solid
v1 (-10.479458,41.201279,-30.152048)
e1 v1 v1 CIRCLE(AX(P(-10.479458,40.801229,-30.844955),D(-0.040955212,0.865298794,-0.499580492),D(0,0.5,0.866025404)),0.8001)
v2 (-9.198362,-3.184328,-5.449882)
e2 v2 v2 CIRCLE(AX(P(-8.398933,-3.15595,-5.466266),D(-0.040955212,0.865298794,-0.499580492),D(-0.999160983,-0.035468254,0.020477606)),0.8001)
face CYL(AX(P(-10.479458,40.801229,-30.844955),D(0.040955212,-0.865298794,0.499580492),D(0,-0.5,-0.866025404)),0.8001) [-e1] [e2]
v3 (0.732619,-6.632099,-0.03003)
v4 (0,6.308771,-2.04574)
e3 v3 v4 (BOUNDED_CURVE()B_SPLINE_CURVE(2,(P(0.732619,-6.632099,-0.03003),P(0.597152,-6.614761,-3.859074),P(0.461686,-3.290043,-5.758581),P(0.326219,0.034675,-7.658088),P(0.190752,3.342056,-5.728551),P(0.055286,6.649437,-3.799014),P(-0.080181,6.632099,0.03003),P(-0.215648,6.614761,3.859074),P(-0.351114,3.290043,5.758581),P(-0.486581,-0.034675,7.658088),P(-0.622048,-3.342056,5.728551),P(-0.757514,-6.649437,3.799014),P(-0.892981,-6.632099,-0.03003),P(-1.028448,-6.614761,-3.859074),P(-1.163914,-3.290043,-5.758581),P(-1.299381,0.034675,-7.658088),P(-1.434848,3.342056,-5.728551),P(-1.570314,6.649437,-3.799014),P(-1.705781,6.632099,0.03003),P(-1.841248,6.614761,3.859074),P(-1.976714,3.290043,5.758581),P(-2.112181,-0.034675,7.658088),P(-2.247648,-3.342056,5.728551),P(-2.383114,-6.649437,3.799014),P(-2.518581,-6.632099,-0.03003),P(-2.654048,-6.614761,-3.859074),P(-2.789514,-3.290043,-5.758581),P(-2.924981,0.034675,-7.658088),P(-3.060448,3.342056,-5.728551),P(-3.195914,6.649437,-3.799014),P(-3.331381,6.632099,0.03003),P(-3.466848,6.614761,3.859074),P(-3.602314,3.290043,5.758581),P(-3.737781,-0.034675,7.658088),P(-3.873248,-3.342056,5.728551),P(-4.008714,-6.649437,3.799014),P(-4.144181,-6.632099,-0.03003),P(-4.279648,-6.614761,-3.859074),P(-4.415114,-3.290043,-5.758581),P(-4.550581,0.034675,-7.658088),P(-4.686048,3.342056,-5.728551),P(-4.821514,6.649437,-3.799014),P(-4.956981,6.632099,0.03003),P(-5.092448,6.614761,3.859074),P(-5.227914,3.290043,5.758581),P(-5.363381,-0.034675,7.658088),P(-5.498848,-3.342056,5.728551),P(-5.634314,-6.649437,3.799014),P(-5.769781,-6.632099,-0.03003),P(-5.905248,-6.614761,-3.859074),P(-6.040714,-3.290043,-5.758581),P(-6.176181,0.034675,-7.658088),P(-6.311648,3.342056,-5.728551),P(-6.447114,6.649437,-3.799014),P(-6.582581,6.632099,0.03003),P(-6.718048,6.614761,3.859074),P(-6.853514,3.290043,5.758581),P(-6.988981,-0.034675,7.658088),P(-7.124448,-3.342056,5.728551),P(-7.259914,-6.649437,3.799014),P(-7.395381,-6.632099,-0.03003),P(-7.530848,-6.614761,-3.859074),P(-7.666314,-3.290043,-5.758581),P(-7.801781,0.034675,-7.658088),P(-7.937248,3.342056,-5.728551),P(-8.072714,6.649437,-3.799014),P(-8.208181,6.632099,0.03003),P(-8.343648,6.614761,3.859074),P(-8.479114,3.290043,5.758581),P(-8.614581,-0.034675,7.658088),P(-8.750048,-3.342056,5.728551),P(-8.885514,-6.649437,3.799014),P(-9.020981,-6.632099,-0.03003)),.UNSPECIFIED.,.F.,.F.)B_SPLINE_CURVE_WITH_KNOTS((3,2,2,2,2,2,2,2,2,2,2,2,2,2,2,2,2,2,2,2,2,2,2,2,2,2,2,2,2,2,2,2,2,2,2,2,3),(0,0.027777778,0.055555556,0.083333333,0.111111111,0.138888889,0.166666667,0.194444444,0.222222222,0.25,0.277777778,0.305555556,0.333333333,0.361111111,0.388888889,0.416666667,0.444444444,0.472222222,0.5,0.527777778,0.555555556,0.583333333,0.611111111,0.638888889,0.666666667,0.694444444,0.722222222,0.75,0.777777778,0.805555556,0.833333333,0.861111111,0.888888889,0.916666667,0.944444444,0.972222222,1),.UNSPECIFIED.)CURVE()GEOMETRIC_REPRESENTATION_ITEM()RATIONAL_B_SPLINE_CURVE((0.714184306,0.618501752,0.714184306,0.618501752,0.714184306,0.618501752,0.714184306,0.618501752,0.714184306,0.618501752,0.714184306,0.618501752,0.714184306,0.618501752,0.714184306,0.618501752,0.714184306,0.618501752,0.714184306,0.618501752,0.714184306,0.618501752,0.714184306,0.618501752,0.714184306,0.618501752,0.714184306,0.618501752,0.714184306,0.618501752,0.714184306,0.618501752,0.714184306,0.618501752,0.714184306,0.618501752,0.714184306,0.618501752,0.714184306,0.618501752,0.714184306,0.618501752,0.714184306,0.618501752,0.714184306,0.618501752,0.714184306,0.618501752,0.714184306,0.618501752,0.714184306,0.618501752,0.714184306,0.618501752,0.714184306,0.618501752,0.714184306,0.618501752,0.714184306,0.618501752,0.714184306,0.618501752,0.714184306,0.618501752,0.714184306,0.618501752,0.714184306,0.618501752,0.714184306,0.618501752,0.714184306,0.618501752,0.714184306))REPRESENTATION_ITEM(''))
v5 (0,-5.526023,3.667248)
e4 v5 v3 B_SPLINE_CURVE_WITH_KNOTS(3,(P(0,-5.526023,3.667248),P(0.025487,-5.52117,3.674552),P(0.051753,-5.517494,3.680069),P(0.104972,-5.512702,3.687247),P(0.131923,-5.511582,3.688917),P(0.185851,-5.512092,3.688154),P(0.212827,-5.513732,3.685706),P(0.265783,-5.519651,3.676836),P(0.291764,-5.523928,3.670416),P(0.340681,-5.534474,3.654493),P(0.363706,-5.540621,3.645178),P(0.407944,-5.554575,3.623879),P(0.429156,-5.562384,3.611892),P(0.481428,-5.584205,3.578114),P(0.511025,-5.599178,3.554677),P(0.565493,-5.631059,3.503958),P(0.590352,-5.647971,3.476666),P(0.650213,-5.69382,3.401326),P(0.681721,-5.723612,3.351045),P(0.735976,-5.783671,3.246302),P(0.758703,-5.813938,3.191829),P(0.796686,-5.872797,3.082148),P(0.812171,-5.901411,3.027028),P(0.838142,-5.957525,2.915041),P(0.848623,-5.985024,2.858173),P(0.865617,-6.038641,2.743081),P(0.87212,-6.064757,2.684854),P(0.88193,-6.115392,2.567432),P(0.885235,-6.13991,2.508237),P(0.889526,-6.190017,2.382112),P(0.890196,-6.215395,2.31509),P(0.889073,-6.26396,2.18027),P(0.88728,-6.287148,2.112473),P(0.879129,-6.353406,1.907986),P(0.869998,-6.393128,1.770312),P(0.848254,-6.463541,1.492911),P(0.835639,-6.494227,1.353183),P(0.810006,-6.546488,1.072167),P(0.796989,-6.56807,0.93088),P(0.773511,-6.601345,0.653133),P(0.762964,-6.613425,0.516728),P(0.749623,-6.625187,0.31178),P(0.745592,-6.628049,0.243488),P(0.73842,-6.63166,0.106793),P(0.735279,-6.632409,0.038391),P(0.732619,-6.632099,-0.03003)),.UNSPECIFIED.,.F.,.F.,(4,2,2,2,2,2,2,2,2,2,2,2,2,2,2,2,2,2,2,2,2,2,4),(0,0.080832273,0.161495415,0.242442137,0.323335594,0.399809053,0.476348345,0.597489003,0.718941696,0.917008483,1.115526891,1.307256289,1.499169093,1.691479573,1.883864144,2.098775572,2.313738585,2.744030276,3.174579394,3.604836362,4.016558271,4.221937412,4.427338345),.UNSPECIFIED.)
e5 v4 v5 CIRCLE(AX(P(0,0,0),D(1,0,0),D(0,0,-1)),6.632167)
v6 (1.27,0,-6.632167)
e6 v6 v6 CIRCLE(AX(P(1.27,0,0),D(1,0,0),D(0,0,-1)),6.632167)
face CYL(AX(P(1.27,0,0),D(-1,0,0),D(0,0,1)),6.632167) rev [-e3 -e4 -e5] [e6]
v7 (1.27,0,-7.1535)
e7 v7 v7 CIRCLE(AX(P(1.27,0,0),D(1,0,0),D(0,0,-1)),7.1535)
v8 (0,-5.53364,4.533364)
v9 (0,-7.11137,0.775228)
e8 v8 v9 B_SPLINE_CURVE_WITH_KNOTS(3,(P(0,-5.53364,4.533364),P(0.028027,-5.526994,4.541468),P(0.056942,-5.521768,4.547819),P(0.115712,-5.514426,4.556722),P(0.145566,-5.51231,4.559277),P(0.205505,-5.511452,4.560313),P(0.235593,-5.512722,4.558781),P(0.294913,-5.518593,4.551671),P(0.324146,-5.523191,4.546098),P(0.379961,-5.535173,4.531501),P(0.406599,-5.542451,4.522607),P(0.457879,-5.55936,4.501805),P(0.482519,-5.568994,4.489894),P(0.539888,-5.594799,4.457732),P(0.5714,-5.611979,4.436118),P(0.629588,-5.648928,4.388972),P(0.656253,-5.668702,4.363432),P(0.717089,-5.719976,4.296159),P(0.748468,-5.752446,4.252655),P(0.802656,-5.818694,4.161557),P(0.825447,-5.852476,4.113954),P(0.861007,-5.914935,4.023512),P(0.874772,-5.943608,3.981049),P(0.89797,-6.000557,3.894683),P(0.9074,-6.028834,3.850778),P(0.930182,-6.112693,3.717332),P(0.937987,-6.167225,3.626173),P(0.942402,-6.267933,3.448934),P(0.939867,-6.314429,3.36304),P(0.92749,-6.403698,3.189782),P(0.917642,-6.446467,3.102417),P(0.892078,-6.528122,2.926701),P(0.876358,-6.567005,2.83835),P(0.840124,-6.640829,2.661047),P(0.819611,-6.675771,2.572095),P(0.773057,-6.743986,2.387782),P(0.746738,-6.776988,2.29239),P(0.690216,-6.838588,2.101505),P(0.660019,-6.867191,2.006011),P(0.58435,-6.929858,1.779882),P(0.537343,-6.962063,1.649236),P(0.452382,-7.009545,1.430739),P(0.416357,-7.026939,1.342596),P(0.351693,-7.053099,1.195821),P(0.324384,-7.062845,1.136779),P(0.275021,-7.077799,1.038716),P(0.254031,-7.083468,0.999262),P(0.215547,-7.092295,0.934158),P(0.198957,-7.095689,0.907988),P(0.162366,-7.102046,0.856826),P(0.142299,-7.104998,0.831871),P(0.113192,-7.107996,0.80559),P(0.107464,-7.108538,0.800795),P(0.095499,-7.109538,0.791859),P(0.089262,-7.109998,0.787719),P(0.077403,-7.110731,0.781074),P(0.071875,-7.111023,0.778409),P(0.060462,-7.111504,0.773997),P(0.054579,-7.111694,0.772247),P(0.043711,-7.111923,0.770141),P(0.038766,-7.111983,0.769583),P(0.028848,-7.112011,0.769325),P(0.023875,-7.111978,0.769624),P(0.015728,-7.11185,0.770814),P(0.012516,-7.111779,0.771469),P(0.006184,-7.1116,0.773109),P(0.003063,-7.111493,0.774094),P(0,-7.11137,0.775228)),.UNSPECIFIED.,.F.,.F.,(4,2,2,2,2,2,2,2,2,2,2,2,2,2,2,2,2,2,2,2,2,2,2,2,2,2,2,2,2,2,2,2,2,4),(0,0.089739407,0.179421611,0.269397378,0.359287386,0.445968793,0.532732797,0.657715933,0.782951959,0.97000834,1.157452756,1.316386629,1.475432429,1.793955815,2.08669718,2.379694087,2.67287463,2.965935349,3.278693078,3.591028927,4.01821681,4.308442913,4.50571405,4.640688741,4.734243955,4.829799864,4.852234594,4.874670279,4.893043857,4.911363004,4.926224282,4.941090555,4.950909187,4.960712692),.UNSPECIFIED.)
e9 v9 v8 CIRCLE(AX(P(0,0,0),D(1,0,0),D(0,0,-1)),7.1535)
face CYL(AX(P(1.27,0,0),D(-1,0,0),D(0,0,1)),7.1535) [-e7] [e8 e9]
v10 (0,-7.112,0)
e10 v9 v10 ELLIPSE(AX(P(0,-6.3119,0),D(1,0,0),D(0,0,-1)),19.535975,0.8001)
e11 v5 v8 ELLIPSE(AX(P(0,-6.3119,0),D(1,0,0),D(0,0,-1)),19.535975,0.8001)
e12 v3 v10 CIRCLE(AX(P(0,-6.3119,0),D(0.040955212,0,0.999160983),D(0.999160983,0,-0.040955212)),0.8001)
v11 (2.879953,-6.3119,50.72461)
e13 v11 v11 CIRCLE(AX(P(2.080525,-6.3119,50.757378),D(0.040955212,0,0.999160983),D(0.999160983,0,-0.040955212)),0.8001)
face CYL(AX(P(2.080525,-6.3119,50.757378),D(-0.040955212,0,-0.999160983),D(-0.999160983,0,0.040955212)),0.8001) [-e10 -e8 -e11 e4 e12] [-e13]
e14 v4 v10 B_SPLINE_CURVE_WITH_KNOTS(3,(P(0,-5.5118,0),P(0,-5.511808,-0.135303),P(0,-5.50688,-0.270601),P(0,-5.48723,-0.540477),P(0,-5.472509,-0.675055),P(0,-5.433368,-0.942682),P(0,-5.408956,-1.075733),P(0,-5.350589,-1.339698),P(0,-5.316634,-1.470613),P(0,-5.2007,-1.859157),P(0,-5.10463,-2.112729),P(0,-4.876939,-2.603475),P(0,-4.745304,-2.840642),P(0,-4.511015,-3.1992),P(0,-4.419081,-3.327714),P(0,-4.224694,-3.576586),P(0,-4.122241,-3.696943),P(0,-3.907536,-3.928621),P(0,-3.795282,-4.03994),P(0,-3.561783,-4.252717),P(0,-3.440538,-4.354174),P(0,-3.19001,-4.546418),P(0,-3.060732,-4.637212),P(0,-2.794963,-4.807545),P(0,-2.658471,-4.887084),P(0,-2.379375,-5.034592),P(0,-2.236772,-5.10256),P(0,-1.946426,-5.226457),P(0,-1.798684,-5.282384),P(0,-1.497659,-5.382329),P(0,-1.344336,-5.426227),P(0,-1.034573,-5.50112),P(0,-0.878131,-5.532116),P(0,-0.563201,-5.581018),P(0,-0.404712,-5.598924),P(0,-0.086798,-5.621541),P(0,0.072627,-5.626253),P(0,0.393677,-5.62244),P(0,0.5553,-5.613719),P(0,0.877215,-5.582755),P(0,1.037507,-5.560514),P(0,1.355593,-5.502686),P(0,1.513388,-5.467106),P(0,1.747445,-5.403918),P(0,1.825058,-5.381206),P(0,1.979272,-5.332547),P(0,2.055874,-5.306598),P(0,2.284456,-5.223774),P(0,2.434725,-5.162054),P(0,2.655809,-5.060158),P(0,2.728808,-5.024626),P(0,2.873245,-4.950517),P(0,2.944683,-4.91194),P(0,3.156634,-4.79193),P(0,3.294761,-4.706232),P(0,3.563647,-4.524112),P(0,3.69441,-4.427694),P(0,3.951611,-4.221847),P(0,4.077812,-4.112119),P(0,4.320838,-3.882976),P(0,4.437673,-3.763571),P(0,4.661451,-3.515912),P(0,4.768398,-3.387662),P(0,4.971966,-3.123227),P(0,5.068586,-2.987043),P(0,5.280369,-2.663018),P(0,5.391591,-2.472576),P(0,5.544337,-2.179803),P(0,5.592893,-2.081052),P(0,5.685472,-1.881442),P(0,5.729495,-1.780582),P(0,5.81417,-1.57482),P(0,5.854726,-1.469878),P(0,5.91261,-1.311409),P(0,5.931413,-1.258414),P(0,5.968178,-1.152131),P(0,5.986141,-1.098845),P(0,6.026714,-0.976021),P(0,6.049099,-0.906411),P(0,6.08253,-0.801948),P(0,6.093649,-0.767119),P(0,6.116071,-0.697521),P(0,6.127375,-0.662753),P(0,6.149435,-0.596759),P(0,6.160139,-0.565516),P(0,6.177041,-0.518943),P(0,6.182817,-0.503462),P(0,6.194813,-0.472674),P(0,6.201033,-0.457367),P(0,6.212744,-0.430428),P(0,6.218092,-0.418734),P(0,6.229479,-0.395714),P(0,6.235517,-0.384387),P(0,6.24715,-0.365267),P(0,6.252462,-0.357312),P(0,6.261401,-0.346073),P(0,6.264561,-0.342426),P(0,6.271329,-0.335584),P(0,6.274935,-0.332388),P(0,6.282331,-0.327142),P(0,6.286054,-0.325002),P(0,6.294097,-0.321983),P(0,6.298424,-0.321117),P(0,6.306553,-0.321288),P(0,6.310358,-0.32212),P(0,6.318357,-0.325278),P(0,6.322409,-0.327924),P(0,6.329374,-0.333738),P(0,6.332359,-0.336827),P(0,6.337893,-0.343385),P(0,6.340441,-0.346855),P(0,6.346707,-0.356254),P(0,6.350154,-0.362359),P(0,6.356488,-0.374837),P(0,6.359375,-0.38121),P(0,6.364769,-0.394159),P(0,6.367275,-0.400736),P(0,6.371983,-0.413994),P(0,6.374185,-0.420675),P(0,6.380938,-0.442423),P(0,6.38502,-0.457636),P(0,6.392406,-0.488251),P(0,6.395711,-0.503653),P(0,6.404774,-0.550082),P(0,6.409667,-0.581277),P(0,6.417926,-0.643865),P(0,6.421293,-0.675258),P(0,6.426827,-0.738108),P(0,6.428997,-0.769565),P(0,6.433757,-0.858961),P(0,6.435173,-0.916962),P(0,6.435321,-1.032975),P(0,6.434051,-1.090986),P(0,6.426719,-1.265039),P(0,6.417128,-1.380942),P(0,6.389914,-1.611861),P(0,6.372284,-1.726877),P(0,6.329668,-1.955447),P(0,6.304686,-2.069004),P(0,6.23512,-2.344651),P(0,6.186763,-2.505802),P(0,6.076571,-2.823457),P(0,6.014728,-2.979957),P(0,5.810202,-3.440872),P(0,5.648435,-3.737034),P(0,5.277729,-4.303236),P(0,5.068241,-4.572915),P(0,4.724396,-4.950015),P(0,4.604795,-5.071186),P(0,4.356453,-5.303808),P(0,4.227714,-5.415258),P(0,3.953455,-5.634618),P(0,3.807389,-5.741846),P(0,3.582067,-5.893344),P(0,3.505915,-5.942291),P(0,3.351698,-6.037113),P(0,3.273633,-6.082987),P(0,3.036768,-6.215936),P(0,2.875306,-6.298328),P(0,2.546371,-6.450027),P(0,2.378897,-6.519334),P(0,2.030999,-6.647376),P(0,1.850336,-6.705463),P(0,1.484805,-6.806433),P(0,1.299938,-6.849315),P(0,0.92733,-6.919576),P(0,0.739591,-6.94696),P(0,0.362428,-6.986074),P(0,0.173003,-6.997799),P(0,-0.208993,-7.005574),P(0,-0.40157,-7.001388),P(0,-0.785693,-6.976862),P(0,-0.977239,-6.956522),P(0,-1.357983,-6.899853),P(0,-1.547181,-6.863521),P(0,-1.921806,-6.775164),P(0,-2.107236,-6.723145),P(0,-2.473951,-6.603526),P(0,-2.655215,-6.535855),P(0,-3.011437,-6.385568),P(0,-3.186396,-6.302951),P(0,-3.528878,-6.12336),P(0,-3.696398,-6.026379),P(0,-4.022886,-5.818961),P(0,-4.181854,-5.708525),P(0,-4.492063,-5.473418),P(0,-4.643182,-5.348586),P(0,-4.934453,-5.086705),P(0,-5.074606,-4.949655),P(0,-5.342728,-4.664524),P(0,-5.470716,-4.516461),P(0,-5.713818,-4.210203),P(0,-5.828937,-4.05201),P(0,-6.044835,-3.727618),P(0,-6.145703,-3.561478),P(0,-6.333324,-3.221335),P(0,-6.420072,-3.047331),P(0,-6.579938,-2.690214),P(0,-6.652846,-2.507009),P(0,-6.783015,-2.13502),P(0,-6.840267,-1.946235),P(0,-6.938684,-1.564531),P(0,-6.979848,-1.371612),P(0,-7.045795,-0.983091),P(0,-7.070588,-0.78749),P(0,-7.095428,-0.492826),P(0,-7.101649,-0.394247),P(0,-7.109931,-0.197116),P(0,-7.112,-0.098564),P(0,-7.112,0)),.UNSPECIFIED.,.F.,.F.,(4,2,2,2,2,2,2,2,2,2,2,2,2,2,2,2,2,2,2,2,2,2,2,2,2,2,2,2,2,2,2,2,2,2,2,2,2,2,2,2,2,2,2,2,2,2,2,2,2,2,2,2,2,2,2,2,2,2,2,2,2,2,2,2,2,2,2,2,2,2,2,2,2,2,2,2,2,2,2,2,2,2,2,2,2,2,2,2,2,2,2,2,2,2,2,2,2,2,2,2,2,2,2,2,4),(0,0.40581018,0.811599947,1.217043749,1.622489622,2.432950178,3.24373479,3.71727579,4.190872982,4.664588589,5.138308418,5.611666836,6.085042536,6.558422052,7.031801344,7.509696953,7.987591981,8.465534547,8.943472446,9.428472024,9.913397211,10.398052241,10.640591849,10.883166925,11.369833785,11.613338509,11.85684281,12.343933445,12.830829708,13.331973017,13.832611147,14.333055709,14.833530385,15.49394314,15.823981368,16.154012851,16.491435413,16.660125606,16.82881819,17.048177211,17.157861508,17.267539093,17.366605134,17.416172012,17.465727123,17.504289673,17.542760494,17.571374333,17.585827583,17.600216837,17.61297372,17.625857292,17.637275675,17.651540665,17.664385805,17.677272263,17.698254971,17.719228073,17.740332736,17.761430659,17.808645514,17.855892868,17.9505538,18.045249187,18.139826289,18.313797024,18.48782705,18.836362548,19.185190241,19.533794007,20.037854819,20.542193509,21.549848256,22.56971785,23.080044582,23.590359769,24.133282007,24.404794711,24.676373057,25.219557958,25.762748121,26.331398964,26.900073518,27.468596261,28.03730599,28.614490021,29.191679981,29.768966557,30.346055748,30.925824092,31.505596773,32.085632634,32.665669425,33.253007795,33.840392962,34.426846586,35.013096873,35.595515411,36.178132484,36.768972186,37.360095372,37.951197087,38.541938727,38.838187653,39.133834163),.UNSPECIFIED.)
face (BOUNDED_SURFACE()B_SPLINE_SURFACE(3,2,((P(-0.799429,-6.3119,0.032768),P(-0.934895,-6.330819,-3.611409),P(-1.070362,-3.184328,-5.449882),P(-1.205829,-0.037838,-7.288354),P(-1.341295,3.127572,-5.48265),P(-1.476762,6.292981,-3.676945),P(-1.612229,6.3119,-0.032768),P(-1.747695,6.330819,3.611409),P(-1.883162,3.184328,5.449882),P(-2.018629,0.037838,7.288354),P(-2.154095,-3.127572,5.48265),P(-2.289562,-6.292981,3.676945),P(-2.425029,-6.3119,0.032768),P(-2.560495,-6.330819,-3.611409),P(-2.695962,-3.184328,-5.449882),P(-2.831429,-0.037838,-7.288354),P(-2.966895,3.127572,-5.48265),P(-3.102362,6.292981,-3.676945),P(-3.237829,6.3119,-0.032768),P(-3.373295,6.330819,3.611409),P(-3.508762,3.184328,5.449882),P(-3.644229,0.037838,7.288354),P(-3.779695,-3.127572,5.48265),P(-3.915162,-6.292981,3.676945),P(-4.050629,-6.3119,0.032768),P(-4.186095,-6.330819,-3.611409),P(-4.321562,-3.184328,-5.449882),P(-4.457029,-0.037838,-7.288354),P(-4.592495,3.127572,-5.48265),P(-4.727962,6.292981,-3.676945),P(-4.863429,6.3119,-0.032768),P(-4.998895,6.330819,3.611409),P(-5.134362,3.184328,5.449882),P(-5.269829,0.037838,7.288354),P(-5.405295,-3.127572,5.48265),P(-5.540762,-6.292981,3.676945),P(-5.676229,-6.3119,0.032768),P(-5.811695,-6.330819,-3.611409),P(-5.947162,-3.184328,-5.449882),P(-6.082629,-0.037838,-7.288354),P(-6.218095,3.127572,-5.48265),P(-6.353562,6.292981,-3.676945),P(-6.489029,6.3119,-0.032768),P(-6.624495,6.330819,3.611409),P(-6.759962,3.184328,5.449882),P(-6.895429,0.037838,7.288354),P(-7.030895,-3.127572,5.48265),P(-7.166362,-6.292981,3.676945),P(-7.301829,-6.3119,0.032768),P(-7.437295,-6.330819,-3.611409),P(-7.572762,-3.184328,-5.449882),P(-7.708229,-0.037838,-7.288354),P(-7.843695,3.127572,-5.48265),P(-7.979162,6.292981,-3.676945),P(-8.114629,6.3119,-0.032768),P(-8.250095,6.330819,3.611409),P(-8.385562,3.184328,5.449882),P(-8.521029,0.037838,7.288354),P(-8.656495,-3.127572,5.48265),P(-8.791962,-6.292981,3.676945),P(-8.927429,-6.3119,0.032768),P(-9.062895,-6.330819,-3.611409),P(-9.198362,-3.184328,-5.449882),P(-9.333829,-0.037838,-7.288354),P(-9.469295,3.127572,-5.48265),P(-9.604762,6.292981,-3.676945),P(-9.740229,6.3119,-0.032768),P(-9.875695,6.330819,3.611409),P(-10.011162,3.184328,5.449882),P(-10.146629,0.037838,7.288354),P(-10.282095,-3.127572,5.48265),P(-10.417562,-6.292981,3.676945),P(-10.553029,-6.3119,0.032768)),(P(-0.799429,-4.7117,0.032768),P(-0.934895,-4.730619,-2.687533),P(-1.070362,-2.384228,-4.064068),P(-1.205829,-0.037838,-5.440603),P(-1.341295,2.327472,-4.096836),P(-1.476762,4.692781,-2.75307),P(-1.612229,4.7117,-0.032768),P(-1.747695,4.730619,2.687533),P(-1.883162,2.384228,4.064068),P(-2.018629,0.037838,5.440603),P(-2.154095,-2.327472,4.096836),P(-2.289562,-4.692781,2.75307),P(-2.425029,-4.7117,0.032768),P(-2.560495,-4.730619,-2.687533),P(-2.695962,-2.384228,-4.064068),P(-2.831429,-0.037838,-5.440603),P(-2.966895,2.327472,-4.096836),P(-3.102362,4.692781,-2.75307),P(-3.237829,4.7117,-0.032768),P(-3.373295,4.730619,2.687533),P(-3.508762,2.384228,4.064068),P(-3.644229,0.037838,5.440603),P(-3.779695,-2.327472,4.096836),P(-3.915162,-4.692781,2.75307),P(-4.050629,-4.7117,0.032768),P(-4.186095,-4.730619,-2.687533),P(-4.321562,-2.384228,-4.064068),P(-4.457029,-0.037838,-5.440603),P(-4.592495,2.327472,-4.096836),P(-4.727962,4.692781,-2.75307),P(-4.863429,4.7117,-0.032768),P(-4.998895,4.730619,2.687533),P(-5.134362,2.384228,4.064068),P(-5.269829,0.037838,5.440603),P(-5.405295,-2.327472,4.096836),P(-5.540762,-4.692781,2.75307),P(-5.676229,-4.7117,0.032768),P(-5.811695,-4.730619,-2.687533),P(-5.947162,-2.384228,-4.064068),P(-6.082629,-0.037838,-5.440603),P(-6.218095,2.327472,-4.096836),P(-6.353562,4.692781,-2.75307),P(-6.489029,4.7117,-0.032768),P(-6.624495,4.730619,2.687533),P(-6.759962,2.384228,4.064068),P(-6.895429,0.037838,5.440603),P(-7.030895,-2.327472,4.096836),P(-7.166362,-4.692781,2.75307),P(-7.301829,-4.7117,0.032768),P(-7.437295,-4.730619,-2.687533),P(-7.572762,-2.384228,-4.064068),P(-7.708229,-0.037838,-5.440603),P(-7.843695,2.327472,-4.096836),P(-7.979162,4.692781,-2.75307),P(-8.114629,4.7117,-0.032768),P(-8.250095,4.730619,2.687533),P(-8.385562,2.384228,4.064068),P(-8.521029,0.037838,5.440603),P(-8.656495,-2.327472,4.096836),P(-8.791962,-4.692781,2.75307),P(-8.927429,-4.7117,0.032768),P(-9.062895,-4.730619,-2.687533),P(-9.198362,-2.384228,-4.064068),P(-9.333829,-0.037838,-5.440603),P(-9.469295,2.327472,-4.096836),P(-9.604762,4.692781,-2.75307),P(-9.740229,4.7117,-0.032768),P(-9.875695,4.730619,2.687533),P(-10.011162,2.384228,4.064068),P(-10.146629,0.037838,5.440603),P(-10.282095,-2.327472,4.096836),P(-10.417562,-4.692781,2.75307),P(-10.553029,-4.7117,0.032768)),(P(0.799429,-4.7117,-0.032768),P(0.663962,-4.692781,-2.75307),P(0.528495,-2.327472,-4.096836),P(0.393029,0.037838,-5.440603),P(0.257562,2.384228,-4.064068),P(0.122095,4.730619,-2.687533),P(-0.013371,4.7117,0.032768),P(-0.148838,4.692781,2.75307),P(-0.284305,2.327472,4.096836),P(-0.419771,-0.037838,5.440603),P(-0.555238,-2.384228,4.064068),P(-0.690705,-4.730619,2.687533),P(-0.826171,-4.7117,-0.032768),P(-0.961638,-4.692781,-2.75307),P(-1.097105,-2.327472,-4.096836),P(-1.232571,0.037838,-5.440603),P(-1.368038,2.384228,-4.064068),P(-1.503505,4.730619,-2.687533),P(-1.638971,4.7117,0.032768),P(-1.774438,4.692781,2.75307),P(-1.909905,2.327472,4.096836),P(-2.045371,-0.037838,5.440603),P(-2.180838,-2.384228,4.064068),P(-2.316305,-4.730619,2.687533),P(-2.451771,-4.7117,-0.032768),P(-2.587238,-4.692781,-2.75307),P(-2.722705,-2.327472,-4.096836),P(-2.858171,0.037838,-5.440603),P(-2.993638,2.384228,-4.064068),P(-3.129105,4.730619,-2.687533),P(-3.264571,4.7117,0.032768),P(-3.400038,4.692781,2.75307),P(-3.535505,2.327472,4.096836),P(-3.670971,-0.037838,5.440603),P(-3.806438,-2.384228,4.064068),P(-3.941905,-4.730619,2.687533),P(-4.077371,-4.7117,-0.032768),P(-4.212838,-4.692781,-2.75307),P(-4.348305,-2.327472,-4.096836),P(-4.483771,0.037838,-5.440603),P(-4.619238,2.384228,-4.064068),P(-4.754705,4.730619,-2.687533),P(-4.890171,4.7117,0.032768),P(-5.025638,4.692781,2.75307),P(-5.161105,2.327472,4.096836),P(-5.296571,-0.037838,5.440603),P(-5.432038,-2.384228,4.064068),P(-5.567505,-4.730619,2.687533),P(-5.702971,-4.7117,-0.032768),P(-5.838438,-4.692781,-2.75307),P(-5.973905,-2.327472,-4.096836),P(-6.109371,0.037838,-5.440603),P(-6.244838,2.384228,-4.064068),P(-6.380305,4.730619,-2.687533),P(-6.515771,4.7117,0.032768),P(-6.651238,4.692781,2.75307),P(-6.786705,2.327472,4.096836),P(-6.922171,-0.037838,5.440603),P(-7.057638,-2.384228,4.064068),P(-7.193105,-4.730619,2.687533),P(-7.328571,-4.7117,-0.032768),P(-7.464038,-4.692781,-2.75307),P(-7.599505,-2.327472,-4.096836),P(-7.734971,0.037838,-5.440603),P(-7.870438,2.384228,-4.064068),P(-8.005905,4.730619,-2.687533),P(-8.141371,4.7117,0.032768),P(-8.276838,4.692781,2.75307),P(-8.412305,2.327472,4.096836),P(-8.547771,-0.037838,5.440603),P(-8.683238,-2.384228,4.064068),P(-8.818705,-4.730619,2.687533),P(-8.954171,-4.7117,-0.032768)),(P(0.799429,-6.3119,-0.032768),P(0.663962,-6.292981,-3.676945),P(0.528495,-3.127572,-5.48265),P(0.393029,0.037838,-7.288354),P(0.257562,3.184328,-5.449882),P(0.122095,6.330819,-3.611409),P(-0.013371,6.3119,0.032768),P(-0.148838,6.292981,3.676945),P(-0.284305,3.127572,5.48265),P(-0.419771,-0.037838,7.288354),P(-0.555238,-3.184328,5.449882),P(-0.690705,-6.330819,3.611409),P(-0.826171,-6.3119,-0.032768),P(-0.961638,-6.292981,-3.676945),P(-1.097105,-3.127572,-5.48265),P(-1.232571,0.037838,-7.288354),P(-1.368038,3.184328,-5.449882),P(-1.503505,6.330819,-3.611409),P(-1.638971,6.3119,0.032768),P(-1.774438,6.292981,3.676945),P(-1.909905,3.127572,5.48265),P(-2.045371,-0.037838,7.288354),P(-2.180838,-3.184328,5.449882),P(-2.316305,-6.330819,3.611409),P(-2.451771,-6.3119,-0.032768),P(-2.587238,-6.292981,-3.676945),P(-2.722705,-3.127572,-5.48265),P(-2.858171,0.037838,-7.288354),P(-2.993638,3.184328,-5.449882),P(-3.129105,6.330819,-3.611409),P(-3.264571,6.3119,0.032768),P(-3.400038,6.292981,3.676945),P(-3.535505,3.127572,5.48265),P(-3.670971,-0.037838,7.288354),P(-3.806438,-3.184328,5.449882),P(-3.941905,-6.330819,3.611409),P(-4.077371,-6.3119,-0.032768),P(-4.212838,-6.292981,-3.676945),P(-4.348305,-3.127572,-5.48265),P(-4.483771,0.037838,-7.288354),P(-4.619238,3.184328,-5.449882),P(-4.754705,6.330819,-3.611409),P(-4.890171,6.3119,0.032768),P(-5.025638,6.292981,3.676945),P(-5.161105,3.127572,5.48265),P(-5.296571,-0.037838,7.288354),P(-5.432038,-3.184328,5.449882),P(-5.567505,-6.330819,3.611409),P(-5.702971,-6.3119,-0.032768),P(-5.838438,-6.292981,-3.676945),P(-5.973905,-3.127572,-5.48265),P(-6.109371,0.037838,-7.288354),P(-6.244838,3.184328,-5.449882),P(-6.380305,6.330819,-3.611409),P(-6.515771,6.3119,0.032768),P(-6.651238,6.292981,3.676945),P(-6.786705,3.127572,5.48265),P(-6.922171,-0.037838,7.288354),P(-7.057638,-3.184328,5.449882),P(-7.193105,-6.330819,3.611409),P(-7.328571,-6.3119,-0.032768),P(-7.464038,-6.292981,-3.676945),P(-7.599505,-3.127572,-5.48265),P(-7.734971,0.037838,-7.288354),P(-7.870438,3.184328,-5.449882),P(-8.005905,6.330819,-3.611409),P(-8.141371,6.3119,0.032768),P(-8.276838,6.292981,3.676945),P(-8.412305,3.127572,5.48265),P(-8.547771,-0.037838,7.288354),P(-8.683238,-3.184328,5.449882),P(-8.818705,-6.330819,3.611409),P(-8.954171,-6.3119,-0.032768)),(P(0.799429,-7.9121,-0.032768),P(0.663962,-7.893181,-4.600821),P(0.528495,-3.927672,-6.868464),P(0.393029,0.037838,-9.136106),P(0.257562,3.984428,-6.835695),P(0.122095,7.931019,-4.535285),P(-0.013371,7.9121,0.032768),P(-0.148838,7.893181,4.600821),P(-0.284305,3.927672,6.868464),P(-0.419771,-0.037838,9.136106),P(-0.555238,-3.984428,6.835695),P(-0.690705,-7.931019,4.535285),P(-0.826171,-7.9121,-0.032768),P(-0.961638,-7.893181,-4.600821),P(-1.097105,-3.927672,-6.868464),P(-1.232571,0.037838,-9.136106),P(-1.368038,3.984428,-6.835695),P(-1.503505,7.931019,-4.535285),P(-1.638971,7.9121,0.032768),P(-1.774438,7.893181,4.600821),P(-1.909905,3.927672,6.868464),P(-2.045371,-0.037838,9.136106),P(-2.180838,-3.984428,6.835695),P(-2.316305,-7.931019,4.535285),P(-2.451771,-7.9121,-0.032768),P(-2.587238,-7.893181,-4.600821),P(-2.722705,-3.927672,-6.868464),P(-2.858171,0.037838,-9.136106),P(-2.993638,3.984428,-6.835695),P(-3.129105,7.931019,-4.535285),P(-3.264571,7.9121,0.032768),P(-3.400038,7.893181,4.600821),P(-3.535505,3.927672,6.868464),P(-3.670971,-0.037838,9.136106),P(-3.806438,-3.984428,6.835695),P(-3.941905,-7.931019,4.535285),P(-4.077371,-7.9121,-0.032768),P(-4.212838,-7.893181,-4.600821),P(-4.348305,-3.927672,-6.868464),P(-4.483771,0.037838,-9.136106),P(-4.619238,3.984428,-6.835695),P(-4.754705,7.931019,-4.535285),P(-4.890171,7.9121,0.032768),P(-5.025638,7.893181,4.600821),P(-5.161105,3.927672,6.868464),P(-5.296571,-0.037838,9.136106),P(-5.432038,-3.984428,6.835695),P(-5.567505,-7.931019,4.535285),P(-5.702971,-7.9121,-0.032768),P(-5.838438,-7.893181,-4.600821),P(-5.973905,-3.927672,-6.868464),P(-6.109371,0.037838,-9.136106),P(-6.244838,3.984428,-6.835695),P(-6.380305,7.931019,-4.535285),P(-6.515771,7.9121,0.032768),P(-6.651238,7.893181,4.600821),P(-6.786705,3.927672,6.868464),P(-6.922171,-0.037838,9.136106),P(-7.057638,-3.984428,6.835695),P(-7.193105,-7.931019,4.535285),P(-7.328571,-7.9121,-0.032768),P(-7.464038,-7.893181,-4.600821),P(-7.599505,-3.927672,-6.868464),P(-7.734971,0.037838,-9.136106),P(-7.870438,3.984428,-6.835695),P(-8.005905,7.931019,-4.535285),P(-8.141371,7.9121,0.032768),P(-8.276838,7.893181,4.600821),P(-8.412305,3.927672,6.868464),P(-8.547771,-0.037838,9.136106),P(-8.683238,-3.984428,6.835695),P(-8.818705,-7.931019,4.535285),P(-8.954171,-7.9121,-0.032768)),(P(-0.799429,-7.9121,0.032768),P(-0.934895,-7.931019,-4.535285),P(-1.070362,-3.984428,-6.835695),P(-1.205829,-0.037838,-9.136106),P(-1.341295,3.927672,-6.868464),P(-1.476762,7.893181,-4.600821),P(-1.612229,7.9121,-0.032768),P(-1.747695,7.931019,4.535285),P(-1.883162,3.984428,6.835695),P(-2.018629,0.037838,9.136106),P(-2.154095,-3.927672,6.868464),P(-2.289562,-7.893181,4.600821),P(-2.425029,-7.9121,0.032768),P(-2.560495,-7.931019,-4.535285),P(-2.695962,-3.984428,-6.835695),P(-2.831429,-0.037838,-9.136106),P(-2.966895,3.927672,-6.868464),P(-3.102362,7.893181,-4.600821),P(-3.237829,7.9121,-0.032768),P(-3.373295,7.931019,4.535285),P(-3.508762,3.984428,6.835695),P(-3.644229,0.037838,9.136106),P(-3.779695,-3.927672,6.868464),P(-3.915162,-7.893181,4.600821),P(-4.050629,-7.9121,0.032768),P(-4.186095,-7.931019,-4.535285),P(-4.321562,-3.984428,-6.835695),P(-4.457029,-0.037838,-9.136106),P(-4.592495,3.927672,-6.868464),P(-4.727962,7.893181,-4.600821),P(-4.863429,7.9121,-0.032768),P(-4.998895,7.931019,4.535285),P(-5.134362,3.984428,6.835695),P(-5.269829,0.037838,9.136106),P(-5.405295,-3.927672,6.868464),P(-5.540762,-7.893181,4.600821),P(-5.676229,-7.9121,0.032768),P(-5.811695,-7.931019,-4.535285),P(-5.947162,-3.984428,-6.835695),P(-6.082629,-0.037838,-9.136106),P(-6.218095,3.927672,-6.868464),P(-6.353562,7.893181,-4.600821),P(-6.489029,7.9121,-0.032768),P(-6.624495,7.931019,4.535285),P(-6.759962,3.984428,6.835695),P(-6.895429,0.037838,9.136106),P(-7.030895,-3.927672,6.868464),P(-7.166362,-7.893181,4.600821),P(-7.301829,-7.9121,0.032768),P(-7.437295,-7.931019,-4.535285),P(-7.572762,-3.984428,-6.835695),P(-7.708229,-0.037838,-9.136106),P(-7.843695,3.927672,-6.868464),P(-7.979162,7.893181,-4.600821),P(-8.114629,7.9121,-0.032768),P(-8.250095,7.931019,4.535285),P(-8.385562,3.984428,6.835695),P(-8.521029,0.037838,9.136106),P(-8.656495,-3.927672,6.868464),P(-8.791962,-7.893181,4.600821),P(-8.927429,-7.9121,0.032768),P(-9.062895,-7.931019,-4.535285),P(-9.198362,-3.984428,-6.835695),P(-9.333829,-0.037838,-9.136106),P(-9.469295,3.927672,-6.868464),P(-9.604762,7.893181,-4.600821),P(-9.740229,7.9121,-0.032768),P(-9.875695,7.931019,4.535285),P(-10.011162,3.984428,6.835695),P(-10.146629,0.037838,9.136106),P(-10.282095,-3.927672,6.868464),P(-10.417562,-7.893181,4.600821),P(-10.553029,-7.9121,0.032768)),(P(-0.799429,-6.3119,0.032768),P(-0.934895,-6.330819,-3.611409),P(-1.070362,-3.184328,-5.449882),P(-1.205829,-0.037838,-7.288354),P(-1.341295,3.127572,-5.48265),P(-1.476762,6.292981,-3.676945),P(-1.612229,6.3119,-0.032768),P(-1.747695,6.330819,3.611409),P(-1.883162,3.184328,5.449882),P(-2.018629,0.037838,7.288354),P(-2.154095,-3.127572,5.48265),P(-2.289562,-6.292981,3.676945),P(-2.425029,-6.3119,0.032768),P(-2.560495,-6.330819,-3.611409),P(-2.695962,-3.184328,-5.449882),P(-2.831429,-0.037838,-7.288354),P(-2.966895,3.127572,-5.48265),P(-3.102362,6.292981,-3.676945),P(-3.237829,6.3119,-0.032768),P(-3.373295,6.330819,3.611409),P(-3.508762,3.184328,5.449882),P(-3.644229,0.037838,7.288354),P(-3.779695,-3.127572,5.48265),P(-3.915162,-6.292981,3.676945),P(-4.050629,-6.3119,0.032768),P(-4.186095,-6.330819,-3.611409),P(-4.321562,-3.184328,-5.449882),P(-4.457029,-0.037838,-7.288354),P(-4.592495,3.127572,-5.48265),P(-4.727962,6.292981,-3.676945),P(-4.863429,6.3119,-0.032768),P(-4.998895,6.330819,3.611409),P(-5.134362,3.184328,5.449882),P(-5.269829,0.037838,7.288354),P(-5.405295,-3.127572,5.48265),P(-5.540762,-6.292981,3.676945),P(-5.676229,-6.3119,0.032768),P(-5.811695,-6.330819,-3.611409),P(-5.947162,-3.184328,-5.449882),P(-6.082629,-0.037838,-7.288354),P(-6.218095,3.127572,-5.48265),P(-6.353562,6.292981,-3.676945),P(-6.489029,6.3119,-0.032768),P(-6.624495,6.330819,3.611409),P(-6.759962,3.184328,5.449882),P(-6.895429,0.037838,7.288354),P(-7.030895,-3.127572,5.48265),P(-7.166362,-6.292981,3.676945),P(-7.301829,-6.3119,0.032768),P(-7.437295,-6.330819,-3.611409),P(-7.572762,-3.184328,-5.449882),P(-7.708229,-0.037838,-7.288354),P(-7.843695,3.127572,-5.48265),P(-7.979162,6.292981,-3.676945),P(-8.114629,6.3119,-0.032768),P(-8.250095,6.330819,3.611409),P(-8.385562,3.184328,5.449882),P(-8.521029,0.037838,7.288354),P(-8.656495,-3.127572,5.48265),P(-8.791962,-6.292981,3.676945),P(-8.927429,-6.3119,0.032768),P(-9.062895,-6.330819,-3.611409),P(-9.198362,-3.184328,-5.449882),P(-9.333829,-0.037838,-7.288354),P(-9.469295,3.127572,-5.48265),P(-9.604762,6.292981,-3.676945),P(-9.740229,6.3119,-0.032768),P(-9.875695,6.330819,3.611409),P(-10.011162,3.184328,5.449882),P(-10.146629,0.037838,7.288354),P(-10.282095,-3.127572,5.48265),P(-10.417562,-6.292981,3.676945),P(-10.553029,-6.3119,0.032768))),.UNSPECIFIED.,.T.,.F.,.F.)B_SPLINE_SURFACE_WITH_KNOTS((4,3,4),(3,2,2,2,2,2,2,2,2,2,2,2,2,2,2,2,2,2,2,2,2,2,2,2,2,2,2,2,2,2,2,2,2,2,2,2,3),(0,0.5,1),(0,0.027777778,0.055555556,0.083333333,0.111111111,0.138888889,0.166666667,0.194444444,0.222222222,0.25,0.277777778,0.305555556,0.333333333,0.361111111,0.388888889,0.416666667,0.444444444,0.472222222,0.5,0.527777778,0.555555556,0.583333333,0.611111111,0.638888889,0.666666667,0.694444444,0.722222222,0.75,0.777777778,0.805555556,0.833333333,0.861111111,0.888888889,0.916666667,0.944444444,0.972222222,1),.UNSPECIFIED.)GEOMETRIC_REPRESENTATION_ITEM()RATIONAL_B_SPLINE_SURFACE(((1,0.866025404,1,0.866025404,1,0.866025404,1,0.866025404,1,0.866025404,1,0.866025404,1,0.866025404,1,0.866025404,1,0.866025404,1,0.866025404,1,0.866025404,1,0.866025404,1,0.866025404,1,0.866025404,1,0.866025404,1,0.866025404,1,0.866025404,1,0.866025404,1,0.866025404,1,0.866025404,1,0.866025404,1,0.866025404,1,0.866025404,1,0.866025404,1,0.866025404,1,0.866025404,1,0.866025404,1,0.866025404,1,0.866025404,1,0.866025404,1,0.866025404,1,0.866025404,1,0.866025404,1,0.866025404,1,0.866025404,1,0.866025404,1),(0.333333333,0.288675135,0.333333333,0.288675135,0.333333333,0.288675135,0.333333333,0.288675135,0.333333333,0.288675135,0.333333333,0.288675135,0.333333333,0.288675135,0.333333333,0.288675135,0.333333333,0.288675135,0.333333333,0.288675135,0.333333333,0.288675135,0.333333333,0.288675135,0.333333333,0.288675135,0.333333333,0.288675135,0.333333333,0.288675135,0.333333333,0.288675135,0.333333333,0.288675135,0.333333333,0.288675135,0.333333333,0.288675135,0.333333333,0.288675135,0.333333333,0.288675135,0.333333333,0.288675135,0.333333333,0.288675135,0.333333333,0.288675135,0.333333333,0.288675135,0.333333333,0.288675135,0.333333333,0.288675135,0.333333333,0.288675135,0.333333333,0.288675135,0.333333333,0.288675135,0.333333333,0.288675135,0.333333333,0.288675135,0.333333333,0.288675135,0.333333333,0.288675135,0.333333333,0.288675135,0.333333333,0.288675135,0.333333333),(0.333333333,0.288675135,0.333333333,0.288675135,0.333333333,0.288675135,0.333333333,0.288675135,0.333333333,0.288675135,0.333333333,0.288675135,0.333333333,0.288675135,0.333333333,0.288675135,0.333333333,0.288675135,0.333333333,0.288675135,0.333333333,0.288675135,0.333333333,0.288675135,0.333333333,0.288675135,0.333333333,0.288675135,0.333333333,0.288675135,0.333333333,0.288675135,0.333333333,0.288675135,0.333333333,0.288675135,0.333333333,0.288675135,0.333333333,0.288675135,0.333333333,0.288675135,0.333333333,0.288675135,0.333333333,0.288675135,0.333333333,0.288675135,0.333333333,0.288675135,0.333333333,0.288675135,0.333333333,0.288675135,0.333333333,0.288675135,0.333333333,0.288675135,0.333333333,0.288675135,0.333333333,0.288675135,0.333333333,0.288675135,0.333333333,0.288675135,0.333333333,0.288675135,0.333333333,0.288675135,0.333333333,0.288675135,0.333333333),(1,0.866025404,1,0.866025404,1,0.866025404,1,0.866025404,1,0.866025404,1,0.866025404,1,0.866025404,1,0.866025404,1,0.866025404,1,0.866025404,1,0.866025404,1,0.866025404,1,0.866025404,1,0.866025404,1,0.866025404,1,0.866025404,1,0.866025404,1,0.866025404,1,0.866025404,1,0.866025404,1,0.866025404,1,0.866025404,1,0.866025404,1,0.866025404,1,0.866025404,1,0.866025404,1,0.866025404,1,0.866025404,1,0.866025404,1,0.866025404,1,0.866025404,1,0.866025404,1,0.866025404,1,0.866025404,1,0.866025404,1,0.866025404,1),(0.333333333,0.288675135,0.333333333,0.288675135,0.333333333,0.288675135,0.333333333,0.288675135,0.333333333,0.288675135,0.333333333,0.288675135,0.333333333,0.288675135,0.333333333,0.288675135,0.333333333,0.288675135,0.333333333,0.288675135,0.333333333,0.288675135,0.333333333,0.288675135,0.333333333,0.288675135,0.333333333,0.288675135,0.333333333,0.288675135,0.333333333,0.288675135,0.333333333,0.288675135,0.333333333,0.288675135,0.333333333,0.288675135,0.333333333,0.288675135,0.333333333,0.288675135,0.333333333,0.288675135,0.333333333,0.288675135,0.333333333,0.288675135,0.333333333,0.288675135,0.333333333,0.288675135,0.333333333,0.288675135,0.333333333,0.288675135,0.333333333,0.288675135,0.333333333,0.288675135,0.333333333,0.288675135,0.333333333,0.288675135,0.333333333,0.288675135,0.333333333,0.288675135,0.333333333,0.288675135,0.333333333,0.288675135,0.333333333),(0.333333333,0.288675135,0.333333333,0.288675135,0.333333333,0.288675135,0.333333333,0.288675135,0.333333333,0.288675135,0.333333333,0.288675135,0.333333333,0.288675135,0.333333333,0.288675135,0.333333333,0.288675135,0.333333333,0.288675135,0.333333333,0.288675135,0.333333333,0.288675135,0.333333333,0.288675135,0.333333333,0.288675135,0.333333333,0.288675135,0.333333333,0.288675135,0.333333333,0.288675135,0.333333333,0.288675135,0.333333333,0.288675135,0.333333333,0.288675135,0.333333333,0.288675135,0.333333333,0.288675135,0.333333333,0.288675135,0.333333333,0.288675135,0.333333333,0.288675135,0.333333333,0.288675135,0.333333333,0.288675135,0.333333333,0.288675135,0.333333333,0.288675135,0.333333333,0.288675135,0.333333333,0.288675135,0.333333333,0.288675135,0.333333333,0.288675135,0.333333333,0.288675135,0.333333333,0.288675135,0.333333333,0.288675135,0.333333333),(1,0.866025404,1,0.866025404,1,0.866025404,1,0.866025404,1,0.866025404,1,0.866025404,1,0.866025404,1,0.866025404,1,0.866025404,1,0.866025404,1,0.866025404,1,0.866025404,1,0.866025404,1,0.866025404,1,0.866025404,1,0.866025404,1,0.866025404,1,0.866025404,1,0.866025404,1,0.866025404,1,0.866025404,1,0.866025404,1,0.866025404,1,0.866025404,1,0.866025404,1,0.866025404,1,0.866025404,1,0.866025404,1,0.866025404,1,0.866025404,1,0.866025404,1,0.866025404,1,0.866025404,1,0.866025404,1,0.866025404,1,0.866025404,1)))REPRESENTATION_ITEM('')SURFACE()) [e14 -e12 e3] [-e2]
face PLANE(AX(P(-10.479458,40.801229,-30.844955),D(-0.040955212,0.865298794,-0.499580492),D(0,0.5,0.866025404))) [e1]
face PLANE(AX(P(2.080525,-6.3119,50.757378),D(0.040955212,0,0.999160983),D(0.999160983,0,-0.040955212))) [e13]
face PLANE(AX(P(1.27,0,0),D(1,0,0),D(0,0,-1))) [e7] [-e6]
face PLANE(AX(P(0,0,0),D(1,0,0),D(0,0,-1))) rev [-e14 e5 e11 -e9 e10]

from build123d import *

# Parameters (mm, degrees)
SWEEP1_PITCH        = 1.6256
SKETCH4_R           = 0.8001
EXTRUDE1_DEPTH      = 50.8
SKETCH5_R           = 0.8001
EXTRUDE2_DEPTH      = 50.8
SKETCH8_R           = 7.153499718
SKETCH8_R_2         = 6.632167036
BOSS_EXTRUDE1_DEPTH = 1.27


with BuildPart() as part:
    # Sweep1: the profile of Sketch3 screwed along a left-hand helix of 5.166667 turns, 6 arcs to a turn; built about Z, then put on its axis
    sweep1_z = Axis((0, 0, 0), (0, 0, 1))
    sweep1_corners = [(6.330491227, -0.032759418, -0.799212861), (7.111783977, 0.000761408, 0.018575629), (6.293308773, 0.032759418, 0.799212861), (5.512016023, -0.000761408, -0.018575629)]
    with BuildLine(mode=Mode.PRIVATE) as sweep1_profile:
        ThreePointArc((6.330491227, -0.032759418, -0.799212861), (6.890649367, -0.02262601, -0.551993881), (7.111783977, 0.000761408, 0.018575629))
        ThreePointArc((7.111783977, 0.000761408, 0.018575629), (6.864357402, 0.023702803, 0.578263786), (6.293308773, 0.032759418, 0.799212861))
        ThreePointArc((6.293308773, 0.032759418, 0.799212861), (5.733150633, 0.02262601, 0.551993881), (5.512016023, -0.000761408, -0.018575629))
        ThreePointArc((5.512016023, -0.000761408, -0.018575629), (5.759442598, -0.023702803, -0.578263786), (6.330491227, -0.032759418, -0.799212861))
    sweep1_cap = Face(sweep1_profile.wire())
    sweep1_arcs = [((6.330491227, -0.032759418, -0.799212861), (7.130375204, -0.03199801, -0.780637232), (7.111783977, 0.000761408, 0.018575629), (1, 0.7071067811865476, 1)), ((7.111783977, 0.000761408, 0.018575629), (7.09319275, 0.033520826, 0.817788489), (6.293308773, 0.032759418, 0.799212861), (1, 0.7071067811865476, 1)), ((6.293308773, 0.032759418, 0.799212861), (5.493424796, 0.03199801, 0.780637232), (5.512016023, -0.000761408, -0.018575629), (1, 0.7071067811865476, 1)), ((5.512016023, -0.000761408, -0.018575629), (5.53060725, -0.033520826, -0.817788489), (6.330491227, -0.032759418, -0.799212861), (1, 0.7071067811865476, 1))]  # start, shoulder, end, weights
    sweep1_turn_angles = [0, -30, -60, -90, -120, -150, -180, -210, -240, -270, -300, -330, -360]
    sweep1_turn_weights = [1, 0.8660254037844387, 1, 0.8660254037844387, 1, 0.8660254037844387, 1, 0.8660254037844387, 1, 0.8660254037844387, 1, 0.8660254037844387, 1]
    sweep1_turn_sides = [Face.make_bezier_surface([[Vector(p[j][0], p[j][1], 0).rotate(sweep1_z, sweep1_turn_angles[2 * i + k]) / sweep1_turn_weights[2 * i + k] + Vector(0, 0, p[j][2] + -SWEEP1_PITCH * sweep1_turn_angles[2 * i + k] / 360) for k in range(3)] for j in range(3)], [[p[3][j] * sweep1_turn_weights[2 * i + k] for k in range(3)] for j in range(3)]) for p in sweep1_arcs for i in range(6)]
    sweep1_last_angles = [-1800, -1830, -1860]
    sweep1_last_weights = [1, 0.8660254037844158, 1]
    sweep1_last_sides = [Face.make_bezier_surface([[Vector(p[j][0], p[j][1], 0).rotate(sweep1_z, sweep1_last_angles[2 * i + k]) / sweep1_last_weights[2 * i + k] + Vector(0, 0, p[j][2] + -SWEEP1_PITCH * sweep1_last_angles[2 * i + k] / 360) for k in range(3)] for j in range(3)], [[p[3][j] * sweep1_last_weights[2 * i + k] for k in range(3)] for j in range(3)]) for p in sweep1_arcs for i in range(1)]
    sweep1 = Plane(origin=(0, 0, 0), x_dir=(0, -1, 0), z_dir=(-1, 0, 0)) * Solid(Shell([*[p.moved(Location((0, 0, SWEEP1_PITCH * i))) for i in range(5) for p in sweep1_turn_sides], *sweep1_last_sides, sweep1_cap, sweep1_cap.rotate(sweep1_z, -1860).moved(Location((0, 0, -SWEEP1_PITCH * -1860 / 360)))]))
    add(sweep1)

    # Sketch4 → Extrude1 (add)
    with BuildSketch(Plane(origin=(0, 0, 0), x_dir=(-0.9988912145610835, 0.02323612909274781, 0.040944154374815696), z_dir=(0.04095521208944008, -1.1519539662441236e-14, 0.9991609833268658))):
        with Locations(Location((-0.146664123, 6.310195817, 0), (0, 0, 1.33145196))):
            Circle(SKETCH4_R)
    extrude(amount=EXTRUDE1_DEPTH)

    # Sketch5 → Extrude2 (add)
    with BuildSketch(Plane(origin=(-0.014087778, 0.297645562, -0.171845745), x_dir=(0.9991609827879865, 0.035484675571451844, -0.02044916315485051), z_dir=(-0.040955212089440085, 0.8652987940313562, -0.49958049166334506))):
        with Locations(Location((-8.392093785, 6.311624382, 0), (0, 0, 180.001881766))):
            Circle(SKETCH5_R)
    extrude(amount=EXTRUDE2_DEPTH)

    # Sketch8 → Boss-Extrude1 (add)
    with BuildSketch(Plane(origin=(0, 0, 0), x_dir=(0, 0, -1), z_dir=(1, 0, 0))):
        with Locations(Location((0, 0, 0), (0, 0, 230.674391039))):
            Circle(SKETCH8_R)
        with Locations(Location((0, 0, 0), (0, 0, 236.430462639))):
            Circle(SKETCH8_R_2, mode=Mode.SUBTRACT)
    extrude(amount=BOSS_EXTRUDE1_DEPTH)


solid = part.part
